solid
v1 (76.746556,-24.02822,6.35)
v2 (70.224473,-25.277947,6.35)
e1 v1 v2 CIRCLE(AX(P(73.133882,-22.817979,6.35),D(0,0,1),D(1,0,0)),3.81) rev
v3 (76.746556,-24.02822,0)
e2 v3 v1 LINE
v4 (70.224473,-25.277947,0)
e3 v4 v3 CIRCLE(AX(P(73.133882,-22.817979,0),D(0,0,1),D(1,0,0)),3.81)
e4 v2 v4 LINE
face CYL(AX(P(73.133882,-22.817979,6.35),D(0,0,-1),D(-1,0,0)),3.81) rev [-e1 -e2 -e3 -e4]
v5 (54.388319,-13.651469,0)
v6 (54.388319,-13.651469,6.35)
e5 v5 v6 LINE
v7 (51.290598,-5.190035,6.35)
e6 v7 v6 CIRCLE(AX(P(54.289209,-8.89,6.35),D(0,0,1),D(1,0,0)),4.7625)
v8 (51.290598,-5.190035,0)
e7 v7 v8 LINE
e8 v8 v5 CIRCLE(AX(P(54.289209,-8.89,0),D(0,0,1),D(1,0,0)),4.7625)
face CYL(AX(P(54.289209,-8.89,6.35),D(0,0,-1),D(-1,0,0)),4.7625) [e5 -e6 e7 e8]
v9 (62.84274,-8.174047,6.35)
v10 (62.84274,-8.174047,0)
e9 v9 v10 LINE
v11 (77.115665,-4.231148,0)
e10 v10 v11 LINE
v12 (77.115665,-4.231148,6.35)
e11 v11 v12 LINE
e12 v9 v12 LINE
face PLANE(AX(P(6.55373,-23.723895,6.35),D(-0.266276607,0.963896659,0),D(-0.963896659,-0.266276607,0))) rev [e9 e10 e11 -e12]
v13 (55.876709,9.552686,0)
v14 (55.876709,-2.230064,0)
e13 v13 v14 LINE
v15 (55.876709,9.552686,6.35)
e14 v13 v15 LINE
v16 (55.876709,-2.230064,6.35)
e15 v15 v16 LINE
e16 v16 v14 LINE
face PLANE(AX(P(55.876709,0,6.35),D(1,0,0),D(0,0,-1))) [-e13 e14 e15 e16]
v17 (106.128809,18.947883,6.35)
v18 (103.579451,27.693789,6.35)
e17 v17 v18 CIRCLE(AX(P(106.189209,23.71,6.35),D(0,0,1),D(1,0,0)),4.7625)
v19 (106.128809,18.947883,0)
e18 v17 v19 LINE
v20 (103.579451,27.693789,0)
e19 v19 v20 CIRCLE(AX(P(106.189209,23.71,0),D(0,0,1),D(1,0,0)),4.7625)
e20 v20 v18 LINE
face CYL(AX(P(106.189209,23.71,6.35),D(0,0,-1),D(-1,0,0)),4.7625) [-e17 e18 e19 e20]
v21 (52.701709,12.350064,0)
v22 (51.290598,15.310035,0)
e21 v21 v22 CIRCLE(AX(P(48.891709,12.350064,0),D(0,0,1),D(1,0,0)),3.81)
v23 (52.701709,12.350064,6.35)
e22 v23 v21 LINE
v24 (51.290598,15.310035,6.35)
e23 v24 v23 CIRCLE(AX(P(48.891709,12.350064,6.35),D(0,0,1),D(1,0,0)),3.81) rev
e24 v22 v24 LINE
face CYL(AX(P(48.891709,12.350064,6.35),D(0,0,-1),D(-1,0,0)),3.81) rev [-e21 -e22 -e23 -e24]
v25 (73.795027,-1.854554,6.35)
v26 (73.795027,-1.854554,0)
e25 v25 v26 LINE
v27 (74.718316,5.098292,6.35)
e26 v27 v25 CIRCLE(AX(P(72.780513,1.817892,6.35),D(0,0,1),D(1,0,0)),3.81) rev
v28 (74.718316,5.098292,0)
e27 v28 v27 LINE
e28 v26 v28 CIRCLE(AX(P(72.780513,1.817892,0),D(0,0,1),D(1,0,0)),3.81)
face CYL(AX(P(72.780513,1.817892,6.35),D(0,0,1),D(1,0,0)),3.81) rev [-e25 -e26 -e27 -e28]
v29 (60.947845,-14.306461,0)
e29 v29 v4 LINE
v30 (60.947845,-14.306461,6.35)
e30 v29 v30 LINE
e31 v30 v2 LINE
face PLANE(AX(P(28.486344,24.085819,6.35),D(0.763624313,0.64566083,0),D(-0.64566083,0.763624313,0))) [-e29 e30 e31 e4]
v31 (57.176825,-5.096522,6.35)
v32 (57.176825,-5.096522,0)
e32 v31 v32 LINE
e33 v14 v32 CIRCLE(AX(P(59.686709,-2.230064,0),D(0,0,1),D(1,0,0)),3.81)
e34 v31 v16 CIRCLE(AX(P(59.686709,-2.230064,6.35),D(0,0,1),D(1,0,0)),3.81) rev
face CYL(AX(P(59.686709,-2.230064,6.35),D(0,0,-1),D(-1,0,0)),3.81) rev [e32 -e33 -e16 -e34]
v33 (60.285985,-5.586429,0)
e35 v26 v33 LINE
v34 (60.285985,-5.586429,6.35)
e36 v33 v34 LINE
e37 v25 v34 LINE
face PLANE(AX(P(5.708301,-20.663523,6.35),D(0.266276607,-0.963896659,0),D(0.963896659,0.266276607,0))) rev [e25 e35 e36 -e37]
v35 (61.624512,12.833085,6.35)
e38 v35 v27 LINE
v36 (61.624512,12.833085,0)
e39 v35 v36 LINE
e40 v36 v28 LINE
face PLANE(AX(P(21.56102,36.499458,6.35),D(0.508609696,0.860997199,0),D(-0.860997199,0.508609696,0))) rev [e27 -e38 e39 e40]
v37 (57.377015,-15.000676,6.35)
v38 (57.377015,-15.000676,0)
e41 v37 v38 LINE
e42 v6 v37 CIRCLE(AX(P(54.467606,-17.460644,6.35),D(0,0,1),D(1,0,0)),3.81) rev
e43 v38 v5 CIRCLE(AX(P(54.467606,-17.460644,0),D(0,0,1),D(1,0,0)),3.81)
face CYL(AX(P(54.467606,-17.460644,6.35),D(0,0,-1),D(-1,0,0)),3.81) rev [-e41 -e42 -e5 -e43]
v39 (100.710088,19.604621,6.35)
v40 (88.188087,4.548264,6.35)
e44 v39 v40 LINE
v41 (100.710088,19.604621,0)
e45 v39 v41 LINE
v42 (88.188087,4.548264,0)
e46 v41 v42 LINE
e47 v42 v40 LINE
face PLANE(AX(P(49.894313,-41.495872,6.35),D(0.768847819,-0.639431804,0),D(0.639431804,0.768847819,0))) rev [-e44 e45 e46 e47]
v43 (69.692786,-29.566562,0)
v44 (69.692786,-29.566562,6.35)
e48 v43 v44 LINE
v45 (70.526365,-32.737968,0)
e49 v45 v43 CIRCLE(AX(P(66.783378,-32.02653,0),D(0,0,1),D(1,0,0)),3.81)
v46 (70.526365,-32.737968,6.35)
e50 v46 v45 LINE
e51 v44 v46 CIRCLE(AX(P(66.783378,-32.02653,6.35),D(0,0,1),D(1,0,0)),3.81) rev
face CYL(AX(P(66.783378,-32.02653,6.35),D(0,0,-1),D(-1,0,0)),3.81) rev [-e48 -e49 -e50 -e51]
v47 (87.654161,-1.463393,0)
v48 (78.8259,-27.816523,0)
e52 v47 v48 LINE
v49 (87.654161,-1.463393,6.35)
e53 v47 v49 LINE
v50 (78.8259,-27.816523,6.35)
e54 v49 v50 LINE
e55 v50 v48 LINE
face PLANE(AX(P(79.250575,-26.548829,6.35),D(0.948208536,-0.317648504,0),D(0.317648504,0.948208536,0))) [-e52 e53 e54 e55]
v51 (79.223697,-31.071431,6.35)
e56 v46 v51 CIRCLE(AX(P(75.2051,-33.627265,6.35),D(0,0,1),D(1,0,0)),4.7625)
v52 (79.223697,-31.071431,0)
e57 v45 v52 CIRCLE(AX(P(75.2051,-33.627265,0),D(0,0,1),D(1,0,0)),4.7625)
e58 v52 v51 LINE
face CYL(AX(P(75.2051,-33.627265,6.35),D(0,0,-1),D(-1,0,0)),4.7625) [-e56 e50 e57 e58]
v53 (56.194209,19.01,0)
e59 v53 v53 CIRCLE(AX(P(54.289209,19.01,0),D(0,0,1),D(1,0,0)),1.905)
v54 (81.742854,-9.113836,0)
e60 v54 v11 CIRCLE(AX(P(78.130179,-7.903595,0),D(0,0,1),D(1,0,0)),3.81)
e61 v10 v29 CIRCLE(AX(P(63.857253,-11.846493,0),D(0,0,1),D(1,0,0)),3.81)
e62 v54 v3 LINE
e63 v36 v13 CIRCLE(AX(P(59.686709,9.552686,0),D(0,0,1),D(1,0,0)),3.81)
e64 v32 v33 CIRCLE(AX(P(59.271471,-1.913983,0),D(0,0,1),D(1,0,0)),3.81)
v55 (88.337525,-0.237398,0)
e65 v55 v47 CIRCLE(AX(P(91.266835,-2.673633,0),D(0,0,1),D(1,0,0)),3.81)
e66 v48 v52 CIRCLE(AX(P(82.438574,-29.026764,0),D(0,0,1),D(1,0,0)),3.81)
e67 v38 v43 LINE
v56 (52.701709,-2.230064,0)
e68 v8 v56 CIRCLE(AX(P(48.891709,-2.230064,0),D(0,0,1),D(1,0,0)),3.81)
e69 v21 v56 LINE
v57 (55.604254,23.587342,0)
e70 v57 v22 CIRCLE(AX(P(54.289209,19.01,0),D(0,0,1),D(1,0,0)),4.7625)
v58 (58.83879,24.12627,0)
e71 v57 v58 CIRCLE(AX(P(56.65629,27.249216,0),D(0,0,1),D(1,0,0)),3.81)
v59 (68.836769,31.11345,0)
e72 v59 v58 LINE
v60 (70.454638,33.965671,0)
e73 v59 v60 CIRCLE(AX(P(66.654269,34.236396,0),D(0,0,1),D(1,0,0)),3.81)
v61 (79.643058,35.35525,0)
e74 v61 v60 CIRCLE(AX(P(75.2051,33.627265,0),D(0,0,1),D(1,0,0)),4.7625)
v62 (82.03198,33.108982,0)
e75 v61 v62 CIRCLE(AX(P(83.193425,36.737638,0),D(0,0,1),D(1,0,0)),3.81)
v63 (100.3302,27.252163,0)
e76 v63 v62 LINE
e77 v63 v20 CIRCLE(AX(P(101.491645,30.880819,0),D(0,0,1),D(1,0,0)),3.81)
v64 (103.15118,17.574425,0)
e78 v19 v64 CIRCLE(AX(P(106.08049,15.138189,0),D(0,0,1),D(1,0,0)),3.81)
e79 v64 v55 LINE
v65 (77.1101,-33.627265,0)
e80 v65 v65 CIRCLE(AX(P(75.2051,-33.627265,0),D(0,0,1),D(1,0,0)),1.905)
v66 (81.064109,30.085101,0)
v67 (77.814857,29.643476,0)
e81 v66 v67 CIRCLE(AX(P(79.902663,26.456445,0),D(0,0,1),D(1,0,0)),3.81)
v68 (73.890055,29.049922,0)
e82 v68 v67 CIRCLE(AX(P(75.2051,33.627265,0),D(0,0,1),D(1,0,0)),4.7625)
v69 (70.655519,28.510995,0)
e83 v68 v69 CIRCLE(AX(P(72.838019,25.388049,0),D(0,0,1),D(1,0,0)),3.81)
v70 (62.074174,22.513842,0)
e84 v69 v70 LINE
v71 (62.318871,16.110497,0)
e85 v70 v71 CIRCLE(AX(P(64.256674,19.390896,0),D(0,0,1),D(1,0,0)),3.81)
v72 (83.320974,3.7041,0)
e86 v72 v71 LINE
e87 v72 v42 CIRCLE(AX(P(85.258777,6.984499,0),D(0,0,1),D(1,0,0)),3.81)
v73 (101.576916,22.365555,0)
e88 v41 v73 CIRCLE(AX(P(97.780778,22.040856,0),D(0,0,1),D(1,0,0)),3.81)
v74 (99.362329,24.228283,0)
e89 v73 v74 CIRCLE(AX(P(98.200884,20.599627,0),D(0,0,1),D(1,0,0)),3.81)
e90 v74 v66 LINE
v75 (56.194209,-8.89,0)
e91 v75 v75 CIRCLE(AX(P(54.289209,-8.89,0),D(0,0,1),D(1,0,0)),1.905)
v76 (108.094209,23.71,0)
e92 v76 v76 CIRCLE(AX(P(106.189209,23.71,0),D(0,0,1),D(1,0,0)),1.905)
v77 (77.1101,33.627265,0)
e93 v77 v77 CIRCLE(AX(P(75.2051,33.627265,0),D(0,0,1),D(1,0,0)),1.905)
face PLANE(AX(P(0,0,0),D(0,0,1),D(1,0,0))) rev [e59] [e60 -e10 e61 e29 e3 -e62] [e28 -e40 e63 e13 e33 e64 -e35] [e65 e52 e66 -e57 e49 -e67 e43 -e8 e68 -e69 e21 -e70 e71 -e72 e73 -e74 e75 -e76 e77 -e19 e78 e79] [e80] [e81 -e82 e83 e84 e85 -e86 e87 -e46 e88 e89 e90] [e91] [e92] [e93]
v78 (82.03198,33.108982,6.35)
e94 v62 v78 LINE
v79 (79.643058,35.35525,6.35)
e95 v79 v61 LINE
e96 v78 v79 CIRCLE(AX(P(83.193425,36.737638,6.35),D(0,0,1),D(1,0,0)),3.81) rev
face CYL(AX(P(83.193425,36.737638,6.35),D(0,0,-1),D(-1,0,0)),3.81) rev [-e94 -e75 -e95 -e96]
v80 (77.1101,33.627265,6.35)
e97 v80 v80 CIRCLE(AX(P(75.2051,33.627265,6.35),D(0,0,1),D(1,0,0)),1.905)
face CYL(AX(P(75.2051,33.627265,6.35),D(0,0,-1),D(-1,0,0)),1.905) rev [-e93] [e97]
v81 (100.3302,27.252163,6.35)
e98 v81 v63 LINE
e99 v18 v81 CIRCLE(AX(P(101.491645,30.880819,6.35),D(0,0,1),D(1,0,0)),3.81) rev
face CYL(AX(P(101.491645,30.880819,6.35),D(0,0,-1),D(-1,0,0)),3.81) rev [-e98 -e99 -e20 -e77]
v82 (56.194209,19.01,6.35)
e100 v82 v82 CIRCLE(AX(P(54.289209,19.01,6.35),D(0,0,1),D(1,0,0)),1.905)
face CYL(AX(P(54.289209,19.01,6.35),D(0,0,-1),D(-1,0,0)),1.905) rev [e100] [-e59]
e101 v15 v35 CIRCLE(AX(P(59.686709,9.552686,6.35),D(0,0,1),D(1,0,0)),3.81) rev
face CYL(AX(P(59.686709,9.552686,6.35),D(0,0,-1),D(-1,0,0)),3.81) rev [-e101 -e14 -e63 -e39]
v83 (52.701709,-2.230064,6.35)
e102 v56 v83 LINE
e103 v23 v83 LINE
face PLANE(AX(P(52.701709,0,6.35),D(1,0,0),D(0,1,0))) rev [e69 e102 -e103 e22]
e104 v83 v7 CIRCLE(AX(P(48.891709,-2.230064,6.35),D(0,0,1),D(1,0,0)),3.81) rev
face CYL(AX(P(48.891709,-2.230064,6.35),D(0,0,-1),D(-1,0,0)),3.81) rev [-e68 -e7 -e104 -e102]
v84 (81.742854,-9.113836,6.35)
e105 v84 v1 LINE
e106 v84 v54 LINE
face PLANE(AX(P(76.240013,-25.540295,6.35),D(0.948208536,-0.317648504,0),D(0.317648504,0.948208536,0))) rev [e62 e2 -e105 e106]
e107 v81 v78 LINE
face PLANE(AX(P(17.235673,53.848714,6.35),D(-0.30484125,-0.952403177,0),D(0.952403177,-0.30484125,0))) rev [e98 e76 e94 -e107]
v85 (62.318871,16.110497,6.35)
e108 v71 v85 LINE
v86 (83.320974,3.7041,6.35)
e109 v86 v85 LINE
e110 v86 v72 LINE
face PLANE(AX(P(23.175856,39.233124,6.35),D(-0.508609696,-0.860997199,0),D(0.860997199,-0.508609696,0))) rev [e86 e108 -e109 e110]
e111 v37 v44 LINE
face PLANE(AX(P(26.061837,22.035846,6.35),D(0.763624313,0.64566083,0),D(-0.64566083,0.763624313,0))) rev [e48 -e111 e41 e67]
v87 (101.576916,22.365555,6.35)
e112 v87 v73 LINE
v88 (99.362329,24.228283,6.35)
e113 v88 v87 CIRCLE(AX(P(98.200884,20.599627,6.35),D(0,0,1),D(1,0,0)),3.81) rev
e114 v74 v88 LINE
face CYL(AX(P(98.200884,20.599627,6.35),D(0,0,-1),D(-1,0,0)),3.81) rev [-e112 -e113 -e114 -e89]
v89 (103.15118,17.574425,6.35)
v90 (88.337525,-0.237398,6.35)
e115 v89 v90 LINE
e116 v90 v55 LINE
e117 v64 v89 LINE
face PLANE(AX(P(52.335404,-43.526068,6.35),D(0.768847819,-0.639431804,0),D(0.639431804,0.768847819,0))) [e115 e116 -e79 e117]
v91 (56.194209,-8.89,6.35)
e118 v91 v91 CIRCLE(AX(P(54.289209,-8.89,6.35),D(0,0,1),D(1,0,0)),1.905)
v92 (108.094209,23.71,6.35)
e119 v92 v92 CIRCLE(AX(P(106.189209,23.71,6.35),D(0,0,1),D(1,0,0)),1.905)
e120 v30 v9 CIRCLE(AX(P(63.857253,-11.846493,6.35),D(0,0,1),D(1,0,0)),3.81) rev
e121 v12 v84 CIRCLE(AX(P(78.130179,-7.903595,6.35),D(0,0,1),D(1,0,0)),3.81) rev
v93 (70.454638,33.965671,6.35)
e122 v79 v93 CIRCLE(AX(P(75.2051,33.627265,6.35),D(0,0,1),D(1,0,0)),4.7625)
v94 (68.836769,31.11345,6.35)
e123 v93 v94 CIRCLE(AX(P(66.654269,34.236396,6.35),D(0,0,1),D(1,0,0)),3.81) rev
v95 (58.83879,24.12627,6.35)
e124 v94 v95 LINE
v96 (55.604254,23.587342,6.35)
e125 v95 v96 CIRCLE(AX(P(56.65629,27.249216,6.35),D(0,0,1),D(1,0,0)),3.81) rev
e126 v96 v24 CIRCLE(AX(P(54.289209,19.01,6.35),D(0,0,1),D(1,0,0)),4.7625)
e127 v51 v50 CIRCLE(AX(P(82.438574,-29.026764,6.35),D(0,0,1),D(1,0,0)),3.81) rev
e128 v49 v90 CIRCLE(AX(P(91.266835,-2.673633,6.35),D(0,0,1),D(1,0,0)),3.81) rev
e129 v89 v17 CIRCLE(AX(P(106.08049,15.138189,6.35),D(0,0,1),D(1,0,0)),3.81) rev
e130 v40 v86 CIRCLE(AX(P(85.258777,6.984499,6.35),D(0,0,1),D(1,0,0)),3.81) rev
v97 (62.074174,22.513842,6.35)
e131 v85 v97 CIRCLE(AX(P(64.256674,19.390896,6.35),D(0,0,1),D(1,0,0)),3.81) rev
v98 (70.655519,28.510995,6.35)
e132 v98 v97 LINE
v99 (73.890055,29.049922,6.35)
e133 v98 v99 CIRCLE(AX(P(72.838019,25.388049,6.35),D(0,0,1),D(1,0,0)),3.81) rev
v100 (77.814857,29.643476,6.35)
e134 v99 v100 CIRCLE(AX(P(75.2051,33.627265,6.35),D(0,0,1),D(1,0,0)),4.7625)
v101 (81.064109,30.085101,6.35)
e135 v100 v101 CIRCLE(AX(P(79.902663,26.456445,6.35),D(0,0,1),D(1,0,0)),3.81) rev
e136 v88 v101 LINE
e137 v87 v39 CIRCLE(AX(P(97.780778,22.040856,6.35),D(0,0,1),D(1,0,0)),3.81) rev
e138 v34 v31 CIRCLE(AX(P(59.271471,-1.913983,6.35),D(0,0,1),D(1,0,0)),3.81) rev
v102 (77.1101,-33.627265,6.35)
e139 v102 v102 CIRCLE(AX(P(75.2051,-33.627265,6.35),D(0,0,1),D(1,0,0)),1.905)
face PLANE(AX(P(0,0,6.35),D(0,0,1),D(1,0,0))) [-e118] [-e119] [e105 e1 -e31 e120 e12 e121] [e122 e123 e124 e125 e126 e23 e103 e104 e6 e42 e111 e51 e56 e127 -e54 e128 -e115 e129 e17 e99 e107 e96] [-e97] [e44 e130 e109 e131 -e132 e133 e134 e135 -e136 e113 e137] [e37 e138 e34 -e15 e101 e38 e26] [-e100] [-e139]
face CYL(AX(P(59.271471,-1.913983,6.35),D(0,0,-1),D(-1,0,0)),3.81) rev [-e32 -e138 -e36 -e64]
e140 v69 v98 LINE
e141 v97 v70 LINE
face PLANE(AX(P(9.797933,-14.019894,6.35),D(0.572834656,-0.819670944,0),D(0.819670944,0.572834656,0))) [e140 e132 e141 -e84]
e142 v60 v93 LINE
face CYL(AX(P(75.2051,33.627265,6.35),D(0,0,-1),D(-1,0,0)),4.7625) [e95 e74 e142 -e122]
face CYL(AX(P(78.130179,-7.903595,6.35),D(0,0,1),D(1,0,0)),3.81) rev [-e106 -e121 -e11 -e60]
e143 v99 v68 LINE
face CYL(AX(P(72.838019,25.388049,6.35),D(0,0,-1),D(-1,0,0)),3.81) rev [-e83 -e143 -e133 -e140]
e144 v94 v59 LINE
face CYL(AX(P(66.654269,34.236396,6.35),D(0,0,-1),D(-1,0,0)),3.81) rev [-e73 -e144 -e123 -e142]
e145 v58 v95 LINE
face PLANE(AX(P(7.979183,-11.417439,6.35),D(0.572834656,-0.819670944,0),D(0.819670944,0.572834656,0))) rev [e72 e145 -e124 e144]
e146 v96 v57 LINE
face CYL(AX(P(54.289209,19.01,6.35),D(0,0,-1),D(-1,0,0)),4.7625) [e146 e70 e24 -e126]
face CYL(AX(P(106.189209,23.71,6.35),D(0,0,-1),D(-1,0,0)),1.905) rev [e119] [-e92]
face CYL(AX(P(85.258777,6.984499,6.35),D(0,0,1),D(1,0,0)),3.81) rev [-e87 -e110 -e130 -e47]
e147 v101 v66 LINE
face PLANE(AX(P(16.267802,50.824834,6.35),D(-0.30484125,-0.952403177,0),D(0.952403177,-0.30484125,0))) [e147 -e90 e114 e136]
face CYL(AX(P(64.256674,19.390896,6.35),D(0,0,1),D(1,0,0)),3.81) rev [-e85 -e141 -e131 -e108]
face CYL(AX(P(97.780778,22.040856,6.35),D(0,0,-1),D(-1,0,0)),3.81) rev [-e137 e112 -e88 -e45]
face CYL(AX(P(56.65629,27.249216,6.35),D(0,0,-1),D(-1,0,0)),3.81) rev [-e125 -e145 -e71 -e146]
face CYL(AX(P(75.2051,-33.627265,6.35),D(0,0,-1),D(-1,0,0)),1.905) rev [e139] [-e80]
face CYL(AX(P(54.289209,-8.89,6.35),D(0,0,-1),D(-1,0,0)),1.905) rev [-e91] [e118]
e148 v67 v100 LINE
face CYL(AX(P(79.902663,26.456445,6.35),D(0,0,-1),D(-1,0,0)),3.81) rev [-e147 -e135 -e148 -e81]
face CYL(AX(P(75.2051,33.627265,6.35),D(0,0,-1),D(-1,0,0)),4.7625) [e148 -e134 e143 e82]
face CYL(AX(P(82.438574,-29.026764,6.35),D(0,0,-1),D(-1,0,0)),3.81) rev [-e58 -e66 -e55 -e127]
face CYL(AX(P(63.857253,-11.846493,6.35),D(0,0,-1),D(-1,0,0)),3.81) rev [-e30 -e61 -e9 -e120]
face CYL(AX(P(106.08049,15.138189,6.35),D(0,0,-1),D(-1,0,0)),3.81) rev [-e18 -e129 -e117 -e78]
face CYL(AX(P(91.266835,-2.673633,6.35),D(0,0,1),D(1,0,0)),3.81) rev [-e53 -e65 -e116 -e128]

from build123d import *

# Parameters (mm, degrees)
SKETCH1_R           = 4.7625
SKETCH1_R_2         = 1.905
BOSS_EXTRUDE1_DEPTH = 6.35
FILLET1_R           = 3.81
FILLET2_R           = 3.81


with BuildPart() as part:
    # Sketch1 → Boss-Extrude1 (new body)
    # profile 1 of 10: a face of its own
    with BuildSketch(Plane.XY):
        with Locations((106.189208713, 23.71)):
            Circle(SKETCH1_R)
        with Locations((106.189208713, 23.71)):
            Circle(SKETCH1_R_2, mode=Mode.SUBTRACT)
    # profile 2 of 10: a face of its own
    with BuildSketch(Plane.XY):
        with BuildLine():
            Line((87.880964772, -0.786362752), (104.53862394, 19.242676846))
            ThreePointArc((104.53862394, 19.242676846), (103.143914747, 20.048362263), (102.097532116, 21.272872823))
            Line((102.097532116, 21.272872823), (86.113888675, 2.054264483))
            Line((86.113888675, 2.054264483), (58.96261429, 18.093110387))
            ThreePointArc((58.96261429, 18.093110387), (58.389707875, 16.587746324), (57.347778506, 15.359444279))
            Line((57.347778506, 15.359444279), (82.443811077, 0.534674233))
            Line((82.443811077, 0.534674233), (58.194514032, -6.164197988))
            ThreePointArc((58.194514032, -6.164197988), (58.832358657, -7.4612961), (59.051708713, -8.89))
            ThreePointArc((59.051708713, -8.89), (59.048766191, -9.057388361), (59.039942261, -9.224569879))
            Line((59.039942261, -9.224569879), (84.017242402, -2.324586685))
            Line((84.017242402, -2.324586685), (75.126101157, -28.865420044))
            ThreePointArc((75.126101157, -28.865420044), (76.717900747, -29.111421646), (78.136663259, -29.873954045))
            Line((78.136663259, -29.873954045), (87.880964772, -0.786362752))
        make_face()
    # profile 3 of 10: a face of its own
    with BuildSketch(Plane.XY):
        with BuildLine():
            ThreePointArc((101.428860996, 23.566836206), (101.65338858, 25.161806453), (102.396731965, 26.590716294))
            Line((102.396731965, 26.590716294), (79.965447461, 33.770428593))
            ThreePointArc((79.965447461, 33.770428593), (79.967061643, 33.698854784), (79.967599745, 33.627264799))
            ThreePointArc((79.967599745, 33.627264799), (79.718583807, 32.107439852), (78.997576492, 30.746548504))
            Line((78.997576492, 30.746548504), (101.428860996, 23.566836206))
        make_face()
    # profile 4 of 10: a face of its own
    with BuildSketch(Plane.XY):
        with Locations((75.205099745, 33.627264799)):
            Circle(SKETCH1_R)
        with Locations((75.205099745, 33.627264799)):
            Circle(SKETCH1_R_2, mode=Mode.SUBTRACT)
    # profile 5 of 10: a face of its own
    with BuildSketch(Plane.XY):
        with BuildLine():
            ThreePointArc((72.434047253, 29.753936212), (71.301416872, 30.89913975), (70.615297221, 32.356391461))
            Line((70.615297221, 32.356391461), (57.060261204, 22.883328587))
            ThreePointArc((57.060261204, 22.883328587), (58.192891585, 21.738125049), (58.879011236, 20.280873338))
            Line((58.879011236, 20.280873338), (72.434047253, 29.753936212))
        make_face()
    # profile 6 of 10: a face of its own
    with BuildSketch(Plane.XY):
        with Locations((54.289208713, 19.01)):
            Circle(SKETCH1_R)
        with Locations((54.289208713, 19.01)):
            Circle(SKETCH1_R_2, mode=Mode.SUBTRACT)
    # profile 7 of 10: a face of its own
    with BuildSketch(Plane.XY):
        with BuildLine():
            ThreePointArc((55.876708713, 14.519871939), (54.289208713, 14.2475), (52.701708713, 14.519871939))
            Line((52.701708713, 14.519871939), (52.701708713, -4.399871939))
            ThreePointArc((52.701708713, -4.399871939), (54.289208713, -4.1275), (55.876708713, -4.399871939))
            Line((55.876708713, -4.399871939), (55.876708713, 14.519871939))
        make_face()
    # profile 8 of 10: a face of its own
    with BuildSketch(Plane.XY):
        with Locations((54.289208713, -8.89)):
            Circle(SKETCH1_R)
        with Locations((54.289208713, -8.89)):
            Circle(SKETCH1_R_2, mode=Mode.SUBTRACT)
    # profile 9 of 10: a face of its own
    with BuildSketch(Plane.XY):
        with BuildLine():
            ThreePointArc((58.400562122, -11.29378439), (57.364168417, -12.526760793), (55.976054927, -13.343757526))
            Line((55.976054927, -13.343757526), (71.093746335, -31.223480409))
            ThreePointArc((71.093746335, -31.223480409), (72.13014004, -29.990504006), (73.518253531, -29.173507273))
            Line((73.518253531, -29.173507273), (58.400562122, -11.29378439))
        make_face()
    # profile 10 of 10: a face of its own
    with BuildSketch(Plane.XY):
        with Locations((75.205099745, -33.627264799)):
            Circle(SKETCH1_R)
        with Locations((75.205099745, -33.627264799)):
            Circle(SKETCH1_R_2, mode=Mode.SUBTRACT)
    extrude(amount=BOSS_EXTRUDE1_DEPTH)

    # Fillet1
    # the kernel refuses this fillet: 3.81 mm, written as the material it adds along each edge
    with BuildSketch(Plane(origin=(58.96261429, 18.093110387, 0), x_dir=(0.8609971993913142, -0.5086096957789081, 0), z_dir=(0, 0, 1)), Plane(origin=(75.126101157, -28.865420044, 0), x_dir=(0.31764850444110154, 0.9482085359383406, 0), z_dir=(0, 0, 1)), Plane(origin=(79.965447461, 33.770428593, 0), x_dir=(0.9524031774112249, -0.30484124992691375, 0), z_dir=(0, 0, 1)), Plane(origin=(104.53862394, 19.242676846, 0), x_dir=(-0.6394318036990395, -0.7688478187640211, 0), z_dir=(0, 0, 1)), Plane(origin=(52.701708713, -4.399871939, 0), x_dir=(0, 1, 0), z_dir=(0, 0, 1)), Plane(origin=(57.060261204, 22.883328587, 0), x_dir=(0.8196709443644911, 0.572834655869059, 0), z_dir=(0, 0, 1))) as fillet1_piece_1:
        with BuildLine():
            CenterArc((2.169808125, 3.81), FILLET1_R, 219.022802565, 50.977197435)
            ThreePointArc((-0.790163513, 1.411111111), (-0.334744459, 0.739341932), (0, 0))
            Line((0, 0), (2.169808125, 0))
        make_face()
    extrude(amount=6.35)
    with BuildSketch(Plane(origin=(86.113888675, 2.054264483, 0), x_dir=(-0.8609971993913146, 0.5086096957789075, 0), z_dir=(0, 0, 1))) as fillet1_piece_2:
        with BuildLine():
            CenterArc((FILLET1_R * 0.85139484235, -FILLET1_R), FILLET1_R, 90, 80.821803005)
            Line((-FILLET1_R * 0.135802191515, -FILLET1_R * 0.840494463015), (0, 0))
            Line((0, 0), (FILLET1_R * 0.85139484235, 0))
        make_face()
    extrude(amount=6.35)
    with BuildSketch(Plane(origin=(102.097532116, 21.272872823, 0), x_dir=(-0.6394318036990395, -0.7688478187640211, 0), z_dir=(0, 0, 1)), Plane(origin=(78.997576492, 30.746548504, 0), x_dir=(0.9524031774112243, -0.3048412499269152, 0), z_dir=(0, 0, 1)), Plane(origin=(58.879011236, 20.280873338, 0), x_dir=(0.819670944364491, 0.5728346558690592, 0), z_dir=(0, 0, 1)), Plane(origin=(73.518253531, -29.173507273, 0), x_dir=(-0.6456608303485428, 0.7636243134903644, 0), z_dir=(0, 0, 1)), Plane(origin=(59.039942261, -9.224569879, 0), x_dir=(0.9638966585389959, 0.2662766074167205, 0), z_dir=(0, 0, 1)), Plane(origin=(57.347778506, 15.359444279, 0), x_dir=(0.8609971993913154, -0.5086096957789064, 0), z_dir=(0, 0, 1))) as fillet1_piece_3:
        with BuildLine():
            CenterArc((2.169808125, -3.81), FILLET1_R, 90, 50.977197435)
            ThreePointArc((-0.790163513, -1.411111111), (-0.334744459, -0.739341932), (0, 0))
            Line((0, 0), (2.169808125, 0))
        make_face()
    extrude(amount=6.35)
    with BuildSketch(Plane(origin=(101.428860996, 23.566836206, 0), x_dir=(0.19934053923435113, -0.9799302778349887, 0), z_dir=(0, 0, 1)), Plane(origin=(72.434047253, 29.753936212, 0), x_dir=(0.9002818811258162, -0.4353074023222692, 0), z_dir=(0, 0, 1)), Plane(origin=(58.400562122, -11.29378439, 0), x_dir=(0.3508244107521176, 0.9364412596743211, 0), z_dir=(0, 0, 1)), Plane(origin=(58.194514032, -6.164197988, 0), x_dir=(-0.7032685796981372, 0.7109242609514496, 0), z_dir=(0, 0, 1)), Plane(origin=(55.876708713, 14.519871939, 0), x_dir=(0.8725214911102023, 0.48857573369010987, 0), z_dir=(0, 0, 1)), Plane(origin=(71.093746335, -31.223480409, 0), x_dir=(-0.3508244107521106, -0.9364412596743238, 0), z_dir=(0, 0, 1))) as fillet1_piece_4:
        with BuildLine():
            CenterArc((2.264191284, -3.754677766), FILLET1_R, 99.775790965, 50.977197435)
            Line((-1.060115597, -1.893204221), (0, 0))
            ThreePointArc((0, 0), (0.808639744, -0.069152792), (1.617279489, 0))
        make_face()
    extrude(amount=6.35)
    with BuildSketch(Plane(origin=(84.017242402, -2.324586685, 0), x_dir=(-0.3176485044411025, -0.9482085359383404, 0), z_dir=(0, 0, 1))) as fillet1_piece_5:
        with BuildLine():
            CenterArc((FILLET1_R * 1.8792860539, -FILLET1_R), FILLET1_R, 90, 123.963598679)
            Line((FILLET1_R * 1.04989338062, -FILLET1_R * 1.55866608409), (0, 0))
            Line((0, 0), (FILLET1_R * 1.8792860539, 0))
        make_face()
    extrude(amount=6.35)
    with BuildSketch(Plane(origin=(55.876708713, -4.399871939, 0), x_dir=(0.8725214911102017, -0.488575733690111, 0), z_dir=(0, 0, 1)), Plane(origin=(70.615297221, 32.356391461, 0), x_dir=(-0.09933921507111794, 0.9950536268709613, 0), z_dir=(0, 0, 1)), Plane(origin=(102.396731965, 26.590716294, 0), x_dir=(0.7313016231106118, 0.682054203150882, 0), z_dir=(0, 0, 1)), Plane(origin=(78.136663259, -29.873954045, 0), x_dir=(0.6721369745474647, -0.740426827881176, 0), z_dir=(0, 0, 1)), Plane(origin=(55.976054927, -13.343757526, 0), x_dir=(-0.9817328385571232, -0.1902646412199953, 0), z_dir=(0, 0, 1)), Plane(origin=(52.701708713, 14.519871939, 0), x_dir=(-0.8725214911102018, 0.48857573369011076, 0), z_dir=(0, 0, 1))) as fillet1_piece_6:
        with BuildLine():
            CenterArc((2.264191284, 3.754677766), FILLET1_R, 209.2470116, 50.977197435)
            Line((-1.060115597, 1.893204221), (0, 0))
            ThreePointArc((0, 0), (0.808639744, 0.069152792), (1.617279489, 0))
        make_face()
    extrude(amount=6.35)
    with BuildSketch(Plane(origin=(82.443811077, 0.534674233, 0), x_dir=(-0.9638966585389961, -0.2662766074167203, 0), z_dir=(0, 0, 1))) as fillet1_piece_7:
        with BuildLine():
            CenterArc((FILLET1_R * 2.35504725068, -FILLET1_R), FILLET1_R, 90, 133.985910602)
            Line((FILLET1_R * 1.63553665117, -FILLET1_R * 1.69448145921), (0, 0))
            Line((0, 0), (FILLET1_R * 2.35504725068, 0))
        make_face()
    extrude(amount=6.35)
    with BuildSketch(Plane(origin=(87.880964772, -0.786362752, 0), x_dir=(-0.3176485044411054, -0.9482085359383393, 0), z_dir=(0, 0, 1))) as fillet1_piece_8:
        with BuildLine():
            CenterArc((FILLET1_R * 0.187404040861, FILLET1_R), FILLET1_R, 248.771312287, 21.228687713)
            Line((-FILLET1_R * 0.174687293783, FILLET1_R * 0.0678573792733), (0, 0))
            Line((0, 0), (FILLET1_R * 0.187404040861, 0))
        make_face()
    extrude(amount=6.35)

    # Fillet2
    fillet2_edges = [part.edges().sort_by_distance(p)[0] for p in [
        (74.278682032, -28.792470042, 3.175),
        (59.113584062, 19.194358415, 3.175),
        (58.904928759, -10.316241556, 3.175),
        (56.72342156, 14.744855925, 3.175),
    ]]
    fillet(fillet2_edges, radius=FILLET2_R)


solid = part.part
